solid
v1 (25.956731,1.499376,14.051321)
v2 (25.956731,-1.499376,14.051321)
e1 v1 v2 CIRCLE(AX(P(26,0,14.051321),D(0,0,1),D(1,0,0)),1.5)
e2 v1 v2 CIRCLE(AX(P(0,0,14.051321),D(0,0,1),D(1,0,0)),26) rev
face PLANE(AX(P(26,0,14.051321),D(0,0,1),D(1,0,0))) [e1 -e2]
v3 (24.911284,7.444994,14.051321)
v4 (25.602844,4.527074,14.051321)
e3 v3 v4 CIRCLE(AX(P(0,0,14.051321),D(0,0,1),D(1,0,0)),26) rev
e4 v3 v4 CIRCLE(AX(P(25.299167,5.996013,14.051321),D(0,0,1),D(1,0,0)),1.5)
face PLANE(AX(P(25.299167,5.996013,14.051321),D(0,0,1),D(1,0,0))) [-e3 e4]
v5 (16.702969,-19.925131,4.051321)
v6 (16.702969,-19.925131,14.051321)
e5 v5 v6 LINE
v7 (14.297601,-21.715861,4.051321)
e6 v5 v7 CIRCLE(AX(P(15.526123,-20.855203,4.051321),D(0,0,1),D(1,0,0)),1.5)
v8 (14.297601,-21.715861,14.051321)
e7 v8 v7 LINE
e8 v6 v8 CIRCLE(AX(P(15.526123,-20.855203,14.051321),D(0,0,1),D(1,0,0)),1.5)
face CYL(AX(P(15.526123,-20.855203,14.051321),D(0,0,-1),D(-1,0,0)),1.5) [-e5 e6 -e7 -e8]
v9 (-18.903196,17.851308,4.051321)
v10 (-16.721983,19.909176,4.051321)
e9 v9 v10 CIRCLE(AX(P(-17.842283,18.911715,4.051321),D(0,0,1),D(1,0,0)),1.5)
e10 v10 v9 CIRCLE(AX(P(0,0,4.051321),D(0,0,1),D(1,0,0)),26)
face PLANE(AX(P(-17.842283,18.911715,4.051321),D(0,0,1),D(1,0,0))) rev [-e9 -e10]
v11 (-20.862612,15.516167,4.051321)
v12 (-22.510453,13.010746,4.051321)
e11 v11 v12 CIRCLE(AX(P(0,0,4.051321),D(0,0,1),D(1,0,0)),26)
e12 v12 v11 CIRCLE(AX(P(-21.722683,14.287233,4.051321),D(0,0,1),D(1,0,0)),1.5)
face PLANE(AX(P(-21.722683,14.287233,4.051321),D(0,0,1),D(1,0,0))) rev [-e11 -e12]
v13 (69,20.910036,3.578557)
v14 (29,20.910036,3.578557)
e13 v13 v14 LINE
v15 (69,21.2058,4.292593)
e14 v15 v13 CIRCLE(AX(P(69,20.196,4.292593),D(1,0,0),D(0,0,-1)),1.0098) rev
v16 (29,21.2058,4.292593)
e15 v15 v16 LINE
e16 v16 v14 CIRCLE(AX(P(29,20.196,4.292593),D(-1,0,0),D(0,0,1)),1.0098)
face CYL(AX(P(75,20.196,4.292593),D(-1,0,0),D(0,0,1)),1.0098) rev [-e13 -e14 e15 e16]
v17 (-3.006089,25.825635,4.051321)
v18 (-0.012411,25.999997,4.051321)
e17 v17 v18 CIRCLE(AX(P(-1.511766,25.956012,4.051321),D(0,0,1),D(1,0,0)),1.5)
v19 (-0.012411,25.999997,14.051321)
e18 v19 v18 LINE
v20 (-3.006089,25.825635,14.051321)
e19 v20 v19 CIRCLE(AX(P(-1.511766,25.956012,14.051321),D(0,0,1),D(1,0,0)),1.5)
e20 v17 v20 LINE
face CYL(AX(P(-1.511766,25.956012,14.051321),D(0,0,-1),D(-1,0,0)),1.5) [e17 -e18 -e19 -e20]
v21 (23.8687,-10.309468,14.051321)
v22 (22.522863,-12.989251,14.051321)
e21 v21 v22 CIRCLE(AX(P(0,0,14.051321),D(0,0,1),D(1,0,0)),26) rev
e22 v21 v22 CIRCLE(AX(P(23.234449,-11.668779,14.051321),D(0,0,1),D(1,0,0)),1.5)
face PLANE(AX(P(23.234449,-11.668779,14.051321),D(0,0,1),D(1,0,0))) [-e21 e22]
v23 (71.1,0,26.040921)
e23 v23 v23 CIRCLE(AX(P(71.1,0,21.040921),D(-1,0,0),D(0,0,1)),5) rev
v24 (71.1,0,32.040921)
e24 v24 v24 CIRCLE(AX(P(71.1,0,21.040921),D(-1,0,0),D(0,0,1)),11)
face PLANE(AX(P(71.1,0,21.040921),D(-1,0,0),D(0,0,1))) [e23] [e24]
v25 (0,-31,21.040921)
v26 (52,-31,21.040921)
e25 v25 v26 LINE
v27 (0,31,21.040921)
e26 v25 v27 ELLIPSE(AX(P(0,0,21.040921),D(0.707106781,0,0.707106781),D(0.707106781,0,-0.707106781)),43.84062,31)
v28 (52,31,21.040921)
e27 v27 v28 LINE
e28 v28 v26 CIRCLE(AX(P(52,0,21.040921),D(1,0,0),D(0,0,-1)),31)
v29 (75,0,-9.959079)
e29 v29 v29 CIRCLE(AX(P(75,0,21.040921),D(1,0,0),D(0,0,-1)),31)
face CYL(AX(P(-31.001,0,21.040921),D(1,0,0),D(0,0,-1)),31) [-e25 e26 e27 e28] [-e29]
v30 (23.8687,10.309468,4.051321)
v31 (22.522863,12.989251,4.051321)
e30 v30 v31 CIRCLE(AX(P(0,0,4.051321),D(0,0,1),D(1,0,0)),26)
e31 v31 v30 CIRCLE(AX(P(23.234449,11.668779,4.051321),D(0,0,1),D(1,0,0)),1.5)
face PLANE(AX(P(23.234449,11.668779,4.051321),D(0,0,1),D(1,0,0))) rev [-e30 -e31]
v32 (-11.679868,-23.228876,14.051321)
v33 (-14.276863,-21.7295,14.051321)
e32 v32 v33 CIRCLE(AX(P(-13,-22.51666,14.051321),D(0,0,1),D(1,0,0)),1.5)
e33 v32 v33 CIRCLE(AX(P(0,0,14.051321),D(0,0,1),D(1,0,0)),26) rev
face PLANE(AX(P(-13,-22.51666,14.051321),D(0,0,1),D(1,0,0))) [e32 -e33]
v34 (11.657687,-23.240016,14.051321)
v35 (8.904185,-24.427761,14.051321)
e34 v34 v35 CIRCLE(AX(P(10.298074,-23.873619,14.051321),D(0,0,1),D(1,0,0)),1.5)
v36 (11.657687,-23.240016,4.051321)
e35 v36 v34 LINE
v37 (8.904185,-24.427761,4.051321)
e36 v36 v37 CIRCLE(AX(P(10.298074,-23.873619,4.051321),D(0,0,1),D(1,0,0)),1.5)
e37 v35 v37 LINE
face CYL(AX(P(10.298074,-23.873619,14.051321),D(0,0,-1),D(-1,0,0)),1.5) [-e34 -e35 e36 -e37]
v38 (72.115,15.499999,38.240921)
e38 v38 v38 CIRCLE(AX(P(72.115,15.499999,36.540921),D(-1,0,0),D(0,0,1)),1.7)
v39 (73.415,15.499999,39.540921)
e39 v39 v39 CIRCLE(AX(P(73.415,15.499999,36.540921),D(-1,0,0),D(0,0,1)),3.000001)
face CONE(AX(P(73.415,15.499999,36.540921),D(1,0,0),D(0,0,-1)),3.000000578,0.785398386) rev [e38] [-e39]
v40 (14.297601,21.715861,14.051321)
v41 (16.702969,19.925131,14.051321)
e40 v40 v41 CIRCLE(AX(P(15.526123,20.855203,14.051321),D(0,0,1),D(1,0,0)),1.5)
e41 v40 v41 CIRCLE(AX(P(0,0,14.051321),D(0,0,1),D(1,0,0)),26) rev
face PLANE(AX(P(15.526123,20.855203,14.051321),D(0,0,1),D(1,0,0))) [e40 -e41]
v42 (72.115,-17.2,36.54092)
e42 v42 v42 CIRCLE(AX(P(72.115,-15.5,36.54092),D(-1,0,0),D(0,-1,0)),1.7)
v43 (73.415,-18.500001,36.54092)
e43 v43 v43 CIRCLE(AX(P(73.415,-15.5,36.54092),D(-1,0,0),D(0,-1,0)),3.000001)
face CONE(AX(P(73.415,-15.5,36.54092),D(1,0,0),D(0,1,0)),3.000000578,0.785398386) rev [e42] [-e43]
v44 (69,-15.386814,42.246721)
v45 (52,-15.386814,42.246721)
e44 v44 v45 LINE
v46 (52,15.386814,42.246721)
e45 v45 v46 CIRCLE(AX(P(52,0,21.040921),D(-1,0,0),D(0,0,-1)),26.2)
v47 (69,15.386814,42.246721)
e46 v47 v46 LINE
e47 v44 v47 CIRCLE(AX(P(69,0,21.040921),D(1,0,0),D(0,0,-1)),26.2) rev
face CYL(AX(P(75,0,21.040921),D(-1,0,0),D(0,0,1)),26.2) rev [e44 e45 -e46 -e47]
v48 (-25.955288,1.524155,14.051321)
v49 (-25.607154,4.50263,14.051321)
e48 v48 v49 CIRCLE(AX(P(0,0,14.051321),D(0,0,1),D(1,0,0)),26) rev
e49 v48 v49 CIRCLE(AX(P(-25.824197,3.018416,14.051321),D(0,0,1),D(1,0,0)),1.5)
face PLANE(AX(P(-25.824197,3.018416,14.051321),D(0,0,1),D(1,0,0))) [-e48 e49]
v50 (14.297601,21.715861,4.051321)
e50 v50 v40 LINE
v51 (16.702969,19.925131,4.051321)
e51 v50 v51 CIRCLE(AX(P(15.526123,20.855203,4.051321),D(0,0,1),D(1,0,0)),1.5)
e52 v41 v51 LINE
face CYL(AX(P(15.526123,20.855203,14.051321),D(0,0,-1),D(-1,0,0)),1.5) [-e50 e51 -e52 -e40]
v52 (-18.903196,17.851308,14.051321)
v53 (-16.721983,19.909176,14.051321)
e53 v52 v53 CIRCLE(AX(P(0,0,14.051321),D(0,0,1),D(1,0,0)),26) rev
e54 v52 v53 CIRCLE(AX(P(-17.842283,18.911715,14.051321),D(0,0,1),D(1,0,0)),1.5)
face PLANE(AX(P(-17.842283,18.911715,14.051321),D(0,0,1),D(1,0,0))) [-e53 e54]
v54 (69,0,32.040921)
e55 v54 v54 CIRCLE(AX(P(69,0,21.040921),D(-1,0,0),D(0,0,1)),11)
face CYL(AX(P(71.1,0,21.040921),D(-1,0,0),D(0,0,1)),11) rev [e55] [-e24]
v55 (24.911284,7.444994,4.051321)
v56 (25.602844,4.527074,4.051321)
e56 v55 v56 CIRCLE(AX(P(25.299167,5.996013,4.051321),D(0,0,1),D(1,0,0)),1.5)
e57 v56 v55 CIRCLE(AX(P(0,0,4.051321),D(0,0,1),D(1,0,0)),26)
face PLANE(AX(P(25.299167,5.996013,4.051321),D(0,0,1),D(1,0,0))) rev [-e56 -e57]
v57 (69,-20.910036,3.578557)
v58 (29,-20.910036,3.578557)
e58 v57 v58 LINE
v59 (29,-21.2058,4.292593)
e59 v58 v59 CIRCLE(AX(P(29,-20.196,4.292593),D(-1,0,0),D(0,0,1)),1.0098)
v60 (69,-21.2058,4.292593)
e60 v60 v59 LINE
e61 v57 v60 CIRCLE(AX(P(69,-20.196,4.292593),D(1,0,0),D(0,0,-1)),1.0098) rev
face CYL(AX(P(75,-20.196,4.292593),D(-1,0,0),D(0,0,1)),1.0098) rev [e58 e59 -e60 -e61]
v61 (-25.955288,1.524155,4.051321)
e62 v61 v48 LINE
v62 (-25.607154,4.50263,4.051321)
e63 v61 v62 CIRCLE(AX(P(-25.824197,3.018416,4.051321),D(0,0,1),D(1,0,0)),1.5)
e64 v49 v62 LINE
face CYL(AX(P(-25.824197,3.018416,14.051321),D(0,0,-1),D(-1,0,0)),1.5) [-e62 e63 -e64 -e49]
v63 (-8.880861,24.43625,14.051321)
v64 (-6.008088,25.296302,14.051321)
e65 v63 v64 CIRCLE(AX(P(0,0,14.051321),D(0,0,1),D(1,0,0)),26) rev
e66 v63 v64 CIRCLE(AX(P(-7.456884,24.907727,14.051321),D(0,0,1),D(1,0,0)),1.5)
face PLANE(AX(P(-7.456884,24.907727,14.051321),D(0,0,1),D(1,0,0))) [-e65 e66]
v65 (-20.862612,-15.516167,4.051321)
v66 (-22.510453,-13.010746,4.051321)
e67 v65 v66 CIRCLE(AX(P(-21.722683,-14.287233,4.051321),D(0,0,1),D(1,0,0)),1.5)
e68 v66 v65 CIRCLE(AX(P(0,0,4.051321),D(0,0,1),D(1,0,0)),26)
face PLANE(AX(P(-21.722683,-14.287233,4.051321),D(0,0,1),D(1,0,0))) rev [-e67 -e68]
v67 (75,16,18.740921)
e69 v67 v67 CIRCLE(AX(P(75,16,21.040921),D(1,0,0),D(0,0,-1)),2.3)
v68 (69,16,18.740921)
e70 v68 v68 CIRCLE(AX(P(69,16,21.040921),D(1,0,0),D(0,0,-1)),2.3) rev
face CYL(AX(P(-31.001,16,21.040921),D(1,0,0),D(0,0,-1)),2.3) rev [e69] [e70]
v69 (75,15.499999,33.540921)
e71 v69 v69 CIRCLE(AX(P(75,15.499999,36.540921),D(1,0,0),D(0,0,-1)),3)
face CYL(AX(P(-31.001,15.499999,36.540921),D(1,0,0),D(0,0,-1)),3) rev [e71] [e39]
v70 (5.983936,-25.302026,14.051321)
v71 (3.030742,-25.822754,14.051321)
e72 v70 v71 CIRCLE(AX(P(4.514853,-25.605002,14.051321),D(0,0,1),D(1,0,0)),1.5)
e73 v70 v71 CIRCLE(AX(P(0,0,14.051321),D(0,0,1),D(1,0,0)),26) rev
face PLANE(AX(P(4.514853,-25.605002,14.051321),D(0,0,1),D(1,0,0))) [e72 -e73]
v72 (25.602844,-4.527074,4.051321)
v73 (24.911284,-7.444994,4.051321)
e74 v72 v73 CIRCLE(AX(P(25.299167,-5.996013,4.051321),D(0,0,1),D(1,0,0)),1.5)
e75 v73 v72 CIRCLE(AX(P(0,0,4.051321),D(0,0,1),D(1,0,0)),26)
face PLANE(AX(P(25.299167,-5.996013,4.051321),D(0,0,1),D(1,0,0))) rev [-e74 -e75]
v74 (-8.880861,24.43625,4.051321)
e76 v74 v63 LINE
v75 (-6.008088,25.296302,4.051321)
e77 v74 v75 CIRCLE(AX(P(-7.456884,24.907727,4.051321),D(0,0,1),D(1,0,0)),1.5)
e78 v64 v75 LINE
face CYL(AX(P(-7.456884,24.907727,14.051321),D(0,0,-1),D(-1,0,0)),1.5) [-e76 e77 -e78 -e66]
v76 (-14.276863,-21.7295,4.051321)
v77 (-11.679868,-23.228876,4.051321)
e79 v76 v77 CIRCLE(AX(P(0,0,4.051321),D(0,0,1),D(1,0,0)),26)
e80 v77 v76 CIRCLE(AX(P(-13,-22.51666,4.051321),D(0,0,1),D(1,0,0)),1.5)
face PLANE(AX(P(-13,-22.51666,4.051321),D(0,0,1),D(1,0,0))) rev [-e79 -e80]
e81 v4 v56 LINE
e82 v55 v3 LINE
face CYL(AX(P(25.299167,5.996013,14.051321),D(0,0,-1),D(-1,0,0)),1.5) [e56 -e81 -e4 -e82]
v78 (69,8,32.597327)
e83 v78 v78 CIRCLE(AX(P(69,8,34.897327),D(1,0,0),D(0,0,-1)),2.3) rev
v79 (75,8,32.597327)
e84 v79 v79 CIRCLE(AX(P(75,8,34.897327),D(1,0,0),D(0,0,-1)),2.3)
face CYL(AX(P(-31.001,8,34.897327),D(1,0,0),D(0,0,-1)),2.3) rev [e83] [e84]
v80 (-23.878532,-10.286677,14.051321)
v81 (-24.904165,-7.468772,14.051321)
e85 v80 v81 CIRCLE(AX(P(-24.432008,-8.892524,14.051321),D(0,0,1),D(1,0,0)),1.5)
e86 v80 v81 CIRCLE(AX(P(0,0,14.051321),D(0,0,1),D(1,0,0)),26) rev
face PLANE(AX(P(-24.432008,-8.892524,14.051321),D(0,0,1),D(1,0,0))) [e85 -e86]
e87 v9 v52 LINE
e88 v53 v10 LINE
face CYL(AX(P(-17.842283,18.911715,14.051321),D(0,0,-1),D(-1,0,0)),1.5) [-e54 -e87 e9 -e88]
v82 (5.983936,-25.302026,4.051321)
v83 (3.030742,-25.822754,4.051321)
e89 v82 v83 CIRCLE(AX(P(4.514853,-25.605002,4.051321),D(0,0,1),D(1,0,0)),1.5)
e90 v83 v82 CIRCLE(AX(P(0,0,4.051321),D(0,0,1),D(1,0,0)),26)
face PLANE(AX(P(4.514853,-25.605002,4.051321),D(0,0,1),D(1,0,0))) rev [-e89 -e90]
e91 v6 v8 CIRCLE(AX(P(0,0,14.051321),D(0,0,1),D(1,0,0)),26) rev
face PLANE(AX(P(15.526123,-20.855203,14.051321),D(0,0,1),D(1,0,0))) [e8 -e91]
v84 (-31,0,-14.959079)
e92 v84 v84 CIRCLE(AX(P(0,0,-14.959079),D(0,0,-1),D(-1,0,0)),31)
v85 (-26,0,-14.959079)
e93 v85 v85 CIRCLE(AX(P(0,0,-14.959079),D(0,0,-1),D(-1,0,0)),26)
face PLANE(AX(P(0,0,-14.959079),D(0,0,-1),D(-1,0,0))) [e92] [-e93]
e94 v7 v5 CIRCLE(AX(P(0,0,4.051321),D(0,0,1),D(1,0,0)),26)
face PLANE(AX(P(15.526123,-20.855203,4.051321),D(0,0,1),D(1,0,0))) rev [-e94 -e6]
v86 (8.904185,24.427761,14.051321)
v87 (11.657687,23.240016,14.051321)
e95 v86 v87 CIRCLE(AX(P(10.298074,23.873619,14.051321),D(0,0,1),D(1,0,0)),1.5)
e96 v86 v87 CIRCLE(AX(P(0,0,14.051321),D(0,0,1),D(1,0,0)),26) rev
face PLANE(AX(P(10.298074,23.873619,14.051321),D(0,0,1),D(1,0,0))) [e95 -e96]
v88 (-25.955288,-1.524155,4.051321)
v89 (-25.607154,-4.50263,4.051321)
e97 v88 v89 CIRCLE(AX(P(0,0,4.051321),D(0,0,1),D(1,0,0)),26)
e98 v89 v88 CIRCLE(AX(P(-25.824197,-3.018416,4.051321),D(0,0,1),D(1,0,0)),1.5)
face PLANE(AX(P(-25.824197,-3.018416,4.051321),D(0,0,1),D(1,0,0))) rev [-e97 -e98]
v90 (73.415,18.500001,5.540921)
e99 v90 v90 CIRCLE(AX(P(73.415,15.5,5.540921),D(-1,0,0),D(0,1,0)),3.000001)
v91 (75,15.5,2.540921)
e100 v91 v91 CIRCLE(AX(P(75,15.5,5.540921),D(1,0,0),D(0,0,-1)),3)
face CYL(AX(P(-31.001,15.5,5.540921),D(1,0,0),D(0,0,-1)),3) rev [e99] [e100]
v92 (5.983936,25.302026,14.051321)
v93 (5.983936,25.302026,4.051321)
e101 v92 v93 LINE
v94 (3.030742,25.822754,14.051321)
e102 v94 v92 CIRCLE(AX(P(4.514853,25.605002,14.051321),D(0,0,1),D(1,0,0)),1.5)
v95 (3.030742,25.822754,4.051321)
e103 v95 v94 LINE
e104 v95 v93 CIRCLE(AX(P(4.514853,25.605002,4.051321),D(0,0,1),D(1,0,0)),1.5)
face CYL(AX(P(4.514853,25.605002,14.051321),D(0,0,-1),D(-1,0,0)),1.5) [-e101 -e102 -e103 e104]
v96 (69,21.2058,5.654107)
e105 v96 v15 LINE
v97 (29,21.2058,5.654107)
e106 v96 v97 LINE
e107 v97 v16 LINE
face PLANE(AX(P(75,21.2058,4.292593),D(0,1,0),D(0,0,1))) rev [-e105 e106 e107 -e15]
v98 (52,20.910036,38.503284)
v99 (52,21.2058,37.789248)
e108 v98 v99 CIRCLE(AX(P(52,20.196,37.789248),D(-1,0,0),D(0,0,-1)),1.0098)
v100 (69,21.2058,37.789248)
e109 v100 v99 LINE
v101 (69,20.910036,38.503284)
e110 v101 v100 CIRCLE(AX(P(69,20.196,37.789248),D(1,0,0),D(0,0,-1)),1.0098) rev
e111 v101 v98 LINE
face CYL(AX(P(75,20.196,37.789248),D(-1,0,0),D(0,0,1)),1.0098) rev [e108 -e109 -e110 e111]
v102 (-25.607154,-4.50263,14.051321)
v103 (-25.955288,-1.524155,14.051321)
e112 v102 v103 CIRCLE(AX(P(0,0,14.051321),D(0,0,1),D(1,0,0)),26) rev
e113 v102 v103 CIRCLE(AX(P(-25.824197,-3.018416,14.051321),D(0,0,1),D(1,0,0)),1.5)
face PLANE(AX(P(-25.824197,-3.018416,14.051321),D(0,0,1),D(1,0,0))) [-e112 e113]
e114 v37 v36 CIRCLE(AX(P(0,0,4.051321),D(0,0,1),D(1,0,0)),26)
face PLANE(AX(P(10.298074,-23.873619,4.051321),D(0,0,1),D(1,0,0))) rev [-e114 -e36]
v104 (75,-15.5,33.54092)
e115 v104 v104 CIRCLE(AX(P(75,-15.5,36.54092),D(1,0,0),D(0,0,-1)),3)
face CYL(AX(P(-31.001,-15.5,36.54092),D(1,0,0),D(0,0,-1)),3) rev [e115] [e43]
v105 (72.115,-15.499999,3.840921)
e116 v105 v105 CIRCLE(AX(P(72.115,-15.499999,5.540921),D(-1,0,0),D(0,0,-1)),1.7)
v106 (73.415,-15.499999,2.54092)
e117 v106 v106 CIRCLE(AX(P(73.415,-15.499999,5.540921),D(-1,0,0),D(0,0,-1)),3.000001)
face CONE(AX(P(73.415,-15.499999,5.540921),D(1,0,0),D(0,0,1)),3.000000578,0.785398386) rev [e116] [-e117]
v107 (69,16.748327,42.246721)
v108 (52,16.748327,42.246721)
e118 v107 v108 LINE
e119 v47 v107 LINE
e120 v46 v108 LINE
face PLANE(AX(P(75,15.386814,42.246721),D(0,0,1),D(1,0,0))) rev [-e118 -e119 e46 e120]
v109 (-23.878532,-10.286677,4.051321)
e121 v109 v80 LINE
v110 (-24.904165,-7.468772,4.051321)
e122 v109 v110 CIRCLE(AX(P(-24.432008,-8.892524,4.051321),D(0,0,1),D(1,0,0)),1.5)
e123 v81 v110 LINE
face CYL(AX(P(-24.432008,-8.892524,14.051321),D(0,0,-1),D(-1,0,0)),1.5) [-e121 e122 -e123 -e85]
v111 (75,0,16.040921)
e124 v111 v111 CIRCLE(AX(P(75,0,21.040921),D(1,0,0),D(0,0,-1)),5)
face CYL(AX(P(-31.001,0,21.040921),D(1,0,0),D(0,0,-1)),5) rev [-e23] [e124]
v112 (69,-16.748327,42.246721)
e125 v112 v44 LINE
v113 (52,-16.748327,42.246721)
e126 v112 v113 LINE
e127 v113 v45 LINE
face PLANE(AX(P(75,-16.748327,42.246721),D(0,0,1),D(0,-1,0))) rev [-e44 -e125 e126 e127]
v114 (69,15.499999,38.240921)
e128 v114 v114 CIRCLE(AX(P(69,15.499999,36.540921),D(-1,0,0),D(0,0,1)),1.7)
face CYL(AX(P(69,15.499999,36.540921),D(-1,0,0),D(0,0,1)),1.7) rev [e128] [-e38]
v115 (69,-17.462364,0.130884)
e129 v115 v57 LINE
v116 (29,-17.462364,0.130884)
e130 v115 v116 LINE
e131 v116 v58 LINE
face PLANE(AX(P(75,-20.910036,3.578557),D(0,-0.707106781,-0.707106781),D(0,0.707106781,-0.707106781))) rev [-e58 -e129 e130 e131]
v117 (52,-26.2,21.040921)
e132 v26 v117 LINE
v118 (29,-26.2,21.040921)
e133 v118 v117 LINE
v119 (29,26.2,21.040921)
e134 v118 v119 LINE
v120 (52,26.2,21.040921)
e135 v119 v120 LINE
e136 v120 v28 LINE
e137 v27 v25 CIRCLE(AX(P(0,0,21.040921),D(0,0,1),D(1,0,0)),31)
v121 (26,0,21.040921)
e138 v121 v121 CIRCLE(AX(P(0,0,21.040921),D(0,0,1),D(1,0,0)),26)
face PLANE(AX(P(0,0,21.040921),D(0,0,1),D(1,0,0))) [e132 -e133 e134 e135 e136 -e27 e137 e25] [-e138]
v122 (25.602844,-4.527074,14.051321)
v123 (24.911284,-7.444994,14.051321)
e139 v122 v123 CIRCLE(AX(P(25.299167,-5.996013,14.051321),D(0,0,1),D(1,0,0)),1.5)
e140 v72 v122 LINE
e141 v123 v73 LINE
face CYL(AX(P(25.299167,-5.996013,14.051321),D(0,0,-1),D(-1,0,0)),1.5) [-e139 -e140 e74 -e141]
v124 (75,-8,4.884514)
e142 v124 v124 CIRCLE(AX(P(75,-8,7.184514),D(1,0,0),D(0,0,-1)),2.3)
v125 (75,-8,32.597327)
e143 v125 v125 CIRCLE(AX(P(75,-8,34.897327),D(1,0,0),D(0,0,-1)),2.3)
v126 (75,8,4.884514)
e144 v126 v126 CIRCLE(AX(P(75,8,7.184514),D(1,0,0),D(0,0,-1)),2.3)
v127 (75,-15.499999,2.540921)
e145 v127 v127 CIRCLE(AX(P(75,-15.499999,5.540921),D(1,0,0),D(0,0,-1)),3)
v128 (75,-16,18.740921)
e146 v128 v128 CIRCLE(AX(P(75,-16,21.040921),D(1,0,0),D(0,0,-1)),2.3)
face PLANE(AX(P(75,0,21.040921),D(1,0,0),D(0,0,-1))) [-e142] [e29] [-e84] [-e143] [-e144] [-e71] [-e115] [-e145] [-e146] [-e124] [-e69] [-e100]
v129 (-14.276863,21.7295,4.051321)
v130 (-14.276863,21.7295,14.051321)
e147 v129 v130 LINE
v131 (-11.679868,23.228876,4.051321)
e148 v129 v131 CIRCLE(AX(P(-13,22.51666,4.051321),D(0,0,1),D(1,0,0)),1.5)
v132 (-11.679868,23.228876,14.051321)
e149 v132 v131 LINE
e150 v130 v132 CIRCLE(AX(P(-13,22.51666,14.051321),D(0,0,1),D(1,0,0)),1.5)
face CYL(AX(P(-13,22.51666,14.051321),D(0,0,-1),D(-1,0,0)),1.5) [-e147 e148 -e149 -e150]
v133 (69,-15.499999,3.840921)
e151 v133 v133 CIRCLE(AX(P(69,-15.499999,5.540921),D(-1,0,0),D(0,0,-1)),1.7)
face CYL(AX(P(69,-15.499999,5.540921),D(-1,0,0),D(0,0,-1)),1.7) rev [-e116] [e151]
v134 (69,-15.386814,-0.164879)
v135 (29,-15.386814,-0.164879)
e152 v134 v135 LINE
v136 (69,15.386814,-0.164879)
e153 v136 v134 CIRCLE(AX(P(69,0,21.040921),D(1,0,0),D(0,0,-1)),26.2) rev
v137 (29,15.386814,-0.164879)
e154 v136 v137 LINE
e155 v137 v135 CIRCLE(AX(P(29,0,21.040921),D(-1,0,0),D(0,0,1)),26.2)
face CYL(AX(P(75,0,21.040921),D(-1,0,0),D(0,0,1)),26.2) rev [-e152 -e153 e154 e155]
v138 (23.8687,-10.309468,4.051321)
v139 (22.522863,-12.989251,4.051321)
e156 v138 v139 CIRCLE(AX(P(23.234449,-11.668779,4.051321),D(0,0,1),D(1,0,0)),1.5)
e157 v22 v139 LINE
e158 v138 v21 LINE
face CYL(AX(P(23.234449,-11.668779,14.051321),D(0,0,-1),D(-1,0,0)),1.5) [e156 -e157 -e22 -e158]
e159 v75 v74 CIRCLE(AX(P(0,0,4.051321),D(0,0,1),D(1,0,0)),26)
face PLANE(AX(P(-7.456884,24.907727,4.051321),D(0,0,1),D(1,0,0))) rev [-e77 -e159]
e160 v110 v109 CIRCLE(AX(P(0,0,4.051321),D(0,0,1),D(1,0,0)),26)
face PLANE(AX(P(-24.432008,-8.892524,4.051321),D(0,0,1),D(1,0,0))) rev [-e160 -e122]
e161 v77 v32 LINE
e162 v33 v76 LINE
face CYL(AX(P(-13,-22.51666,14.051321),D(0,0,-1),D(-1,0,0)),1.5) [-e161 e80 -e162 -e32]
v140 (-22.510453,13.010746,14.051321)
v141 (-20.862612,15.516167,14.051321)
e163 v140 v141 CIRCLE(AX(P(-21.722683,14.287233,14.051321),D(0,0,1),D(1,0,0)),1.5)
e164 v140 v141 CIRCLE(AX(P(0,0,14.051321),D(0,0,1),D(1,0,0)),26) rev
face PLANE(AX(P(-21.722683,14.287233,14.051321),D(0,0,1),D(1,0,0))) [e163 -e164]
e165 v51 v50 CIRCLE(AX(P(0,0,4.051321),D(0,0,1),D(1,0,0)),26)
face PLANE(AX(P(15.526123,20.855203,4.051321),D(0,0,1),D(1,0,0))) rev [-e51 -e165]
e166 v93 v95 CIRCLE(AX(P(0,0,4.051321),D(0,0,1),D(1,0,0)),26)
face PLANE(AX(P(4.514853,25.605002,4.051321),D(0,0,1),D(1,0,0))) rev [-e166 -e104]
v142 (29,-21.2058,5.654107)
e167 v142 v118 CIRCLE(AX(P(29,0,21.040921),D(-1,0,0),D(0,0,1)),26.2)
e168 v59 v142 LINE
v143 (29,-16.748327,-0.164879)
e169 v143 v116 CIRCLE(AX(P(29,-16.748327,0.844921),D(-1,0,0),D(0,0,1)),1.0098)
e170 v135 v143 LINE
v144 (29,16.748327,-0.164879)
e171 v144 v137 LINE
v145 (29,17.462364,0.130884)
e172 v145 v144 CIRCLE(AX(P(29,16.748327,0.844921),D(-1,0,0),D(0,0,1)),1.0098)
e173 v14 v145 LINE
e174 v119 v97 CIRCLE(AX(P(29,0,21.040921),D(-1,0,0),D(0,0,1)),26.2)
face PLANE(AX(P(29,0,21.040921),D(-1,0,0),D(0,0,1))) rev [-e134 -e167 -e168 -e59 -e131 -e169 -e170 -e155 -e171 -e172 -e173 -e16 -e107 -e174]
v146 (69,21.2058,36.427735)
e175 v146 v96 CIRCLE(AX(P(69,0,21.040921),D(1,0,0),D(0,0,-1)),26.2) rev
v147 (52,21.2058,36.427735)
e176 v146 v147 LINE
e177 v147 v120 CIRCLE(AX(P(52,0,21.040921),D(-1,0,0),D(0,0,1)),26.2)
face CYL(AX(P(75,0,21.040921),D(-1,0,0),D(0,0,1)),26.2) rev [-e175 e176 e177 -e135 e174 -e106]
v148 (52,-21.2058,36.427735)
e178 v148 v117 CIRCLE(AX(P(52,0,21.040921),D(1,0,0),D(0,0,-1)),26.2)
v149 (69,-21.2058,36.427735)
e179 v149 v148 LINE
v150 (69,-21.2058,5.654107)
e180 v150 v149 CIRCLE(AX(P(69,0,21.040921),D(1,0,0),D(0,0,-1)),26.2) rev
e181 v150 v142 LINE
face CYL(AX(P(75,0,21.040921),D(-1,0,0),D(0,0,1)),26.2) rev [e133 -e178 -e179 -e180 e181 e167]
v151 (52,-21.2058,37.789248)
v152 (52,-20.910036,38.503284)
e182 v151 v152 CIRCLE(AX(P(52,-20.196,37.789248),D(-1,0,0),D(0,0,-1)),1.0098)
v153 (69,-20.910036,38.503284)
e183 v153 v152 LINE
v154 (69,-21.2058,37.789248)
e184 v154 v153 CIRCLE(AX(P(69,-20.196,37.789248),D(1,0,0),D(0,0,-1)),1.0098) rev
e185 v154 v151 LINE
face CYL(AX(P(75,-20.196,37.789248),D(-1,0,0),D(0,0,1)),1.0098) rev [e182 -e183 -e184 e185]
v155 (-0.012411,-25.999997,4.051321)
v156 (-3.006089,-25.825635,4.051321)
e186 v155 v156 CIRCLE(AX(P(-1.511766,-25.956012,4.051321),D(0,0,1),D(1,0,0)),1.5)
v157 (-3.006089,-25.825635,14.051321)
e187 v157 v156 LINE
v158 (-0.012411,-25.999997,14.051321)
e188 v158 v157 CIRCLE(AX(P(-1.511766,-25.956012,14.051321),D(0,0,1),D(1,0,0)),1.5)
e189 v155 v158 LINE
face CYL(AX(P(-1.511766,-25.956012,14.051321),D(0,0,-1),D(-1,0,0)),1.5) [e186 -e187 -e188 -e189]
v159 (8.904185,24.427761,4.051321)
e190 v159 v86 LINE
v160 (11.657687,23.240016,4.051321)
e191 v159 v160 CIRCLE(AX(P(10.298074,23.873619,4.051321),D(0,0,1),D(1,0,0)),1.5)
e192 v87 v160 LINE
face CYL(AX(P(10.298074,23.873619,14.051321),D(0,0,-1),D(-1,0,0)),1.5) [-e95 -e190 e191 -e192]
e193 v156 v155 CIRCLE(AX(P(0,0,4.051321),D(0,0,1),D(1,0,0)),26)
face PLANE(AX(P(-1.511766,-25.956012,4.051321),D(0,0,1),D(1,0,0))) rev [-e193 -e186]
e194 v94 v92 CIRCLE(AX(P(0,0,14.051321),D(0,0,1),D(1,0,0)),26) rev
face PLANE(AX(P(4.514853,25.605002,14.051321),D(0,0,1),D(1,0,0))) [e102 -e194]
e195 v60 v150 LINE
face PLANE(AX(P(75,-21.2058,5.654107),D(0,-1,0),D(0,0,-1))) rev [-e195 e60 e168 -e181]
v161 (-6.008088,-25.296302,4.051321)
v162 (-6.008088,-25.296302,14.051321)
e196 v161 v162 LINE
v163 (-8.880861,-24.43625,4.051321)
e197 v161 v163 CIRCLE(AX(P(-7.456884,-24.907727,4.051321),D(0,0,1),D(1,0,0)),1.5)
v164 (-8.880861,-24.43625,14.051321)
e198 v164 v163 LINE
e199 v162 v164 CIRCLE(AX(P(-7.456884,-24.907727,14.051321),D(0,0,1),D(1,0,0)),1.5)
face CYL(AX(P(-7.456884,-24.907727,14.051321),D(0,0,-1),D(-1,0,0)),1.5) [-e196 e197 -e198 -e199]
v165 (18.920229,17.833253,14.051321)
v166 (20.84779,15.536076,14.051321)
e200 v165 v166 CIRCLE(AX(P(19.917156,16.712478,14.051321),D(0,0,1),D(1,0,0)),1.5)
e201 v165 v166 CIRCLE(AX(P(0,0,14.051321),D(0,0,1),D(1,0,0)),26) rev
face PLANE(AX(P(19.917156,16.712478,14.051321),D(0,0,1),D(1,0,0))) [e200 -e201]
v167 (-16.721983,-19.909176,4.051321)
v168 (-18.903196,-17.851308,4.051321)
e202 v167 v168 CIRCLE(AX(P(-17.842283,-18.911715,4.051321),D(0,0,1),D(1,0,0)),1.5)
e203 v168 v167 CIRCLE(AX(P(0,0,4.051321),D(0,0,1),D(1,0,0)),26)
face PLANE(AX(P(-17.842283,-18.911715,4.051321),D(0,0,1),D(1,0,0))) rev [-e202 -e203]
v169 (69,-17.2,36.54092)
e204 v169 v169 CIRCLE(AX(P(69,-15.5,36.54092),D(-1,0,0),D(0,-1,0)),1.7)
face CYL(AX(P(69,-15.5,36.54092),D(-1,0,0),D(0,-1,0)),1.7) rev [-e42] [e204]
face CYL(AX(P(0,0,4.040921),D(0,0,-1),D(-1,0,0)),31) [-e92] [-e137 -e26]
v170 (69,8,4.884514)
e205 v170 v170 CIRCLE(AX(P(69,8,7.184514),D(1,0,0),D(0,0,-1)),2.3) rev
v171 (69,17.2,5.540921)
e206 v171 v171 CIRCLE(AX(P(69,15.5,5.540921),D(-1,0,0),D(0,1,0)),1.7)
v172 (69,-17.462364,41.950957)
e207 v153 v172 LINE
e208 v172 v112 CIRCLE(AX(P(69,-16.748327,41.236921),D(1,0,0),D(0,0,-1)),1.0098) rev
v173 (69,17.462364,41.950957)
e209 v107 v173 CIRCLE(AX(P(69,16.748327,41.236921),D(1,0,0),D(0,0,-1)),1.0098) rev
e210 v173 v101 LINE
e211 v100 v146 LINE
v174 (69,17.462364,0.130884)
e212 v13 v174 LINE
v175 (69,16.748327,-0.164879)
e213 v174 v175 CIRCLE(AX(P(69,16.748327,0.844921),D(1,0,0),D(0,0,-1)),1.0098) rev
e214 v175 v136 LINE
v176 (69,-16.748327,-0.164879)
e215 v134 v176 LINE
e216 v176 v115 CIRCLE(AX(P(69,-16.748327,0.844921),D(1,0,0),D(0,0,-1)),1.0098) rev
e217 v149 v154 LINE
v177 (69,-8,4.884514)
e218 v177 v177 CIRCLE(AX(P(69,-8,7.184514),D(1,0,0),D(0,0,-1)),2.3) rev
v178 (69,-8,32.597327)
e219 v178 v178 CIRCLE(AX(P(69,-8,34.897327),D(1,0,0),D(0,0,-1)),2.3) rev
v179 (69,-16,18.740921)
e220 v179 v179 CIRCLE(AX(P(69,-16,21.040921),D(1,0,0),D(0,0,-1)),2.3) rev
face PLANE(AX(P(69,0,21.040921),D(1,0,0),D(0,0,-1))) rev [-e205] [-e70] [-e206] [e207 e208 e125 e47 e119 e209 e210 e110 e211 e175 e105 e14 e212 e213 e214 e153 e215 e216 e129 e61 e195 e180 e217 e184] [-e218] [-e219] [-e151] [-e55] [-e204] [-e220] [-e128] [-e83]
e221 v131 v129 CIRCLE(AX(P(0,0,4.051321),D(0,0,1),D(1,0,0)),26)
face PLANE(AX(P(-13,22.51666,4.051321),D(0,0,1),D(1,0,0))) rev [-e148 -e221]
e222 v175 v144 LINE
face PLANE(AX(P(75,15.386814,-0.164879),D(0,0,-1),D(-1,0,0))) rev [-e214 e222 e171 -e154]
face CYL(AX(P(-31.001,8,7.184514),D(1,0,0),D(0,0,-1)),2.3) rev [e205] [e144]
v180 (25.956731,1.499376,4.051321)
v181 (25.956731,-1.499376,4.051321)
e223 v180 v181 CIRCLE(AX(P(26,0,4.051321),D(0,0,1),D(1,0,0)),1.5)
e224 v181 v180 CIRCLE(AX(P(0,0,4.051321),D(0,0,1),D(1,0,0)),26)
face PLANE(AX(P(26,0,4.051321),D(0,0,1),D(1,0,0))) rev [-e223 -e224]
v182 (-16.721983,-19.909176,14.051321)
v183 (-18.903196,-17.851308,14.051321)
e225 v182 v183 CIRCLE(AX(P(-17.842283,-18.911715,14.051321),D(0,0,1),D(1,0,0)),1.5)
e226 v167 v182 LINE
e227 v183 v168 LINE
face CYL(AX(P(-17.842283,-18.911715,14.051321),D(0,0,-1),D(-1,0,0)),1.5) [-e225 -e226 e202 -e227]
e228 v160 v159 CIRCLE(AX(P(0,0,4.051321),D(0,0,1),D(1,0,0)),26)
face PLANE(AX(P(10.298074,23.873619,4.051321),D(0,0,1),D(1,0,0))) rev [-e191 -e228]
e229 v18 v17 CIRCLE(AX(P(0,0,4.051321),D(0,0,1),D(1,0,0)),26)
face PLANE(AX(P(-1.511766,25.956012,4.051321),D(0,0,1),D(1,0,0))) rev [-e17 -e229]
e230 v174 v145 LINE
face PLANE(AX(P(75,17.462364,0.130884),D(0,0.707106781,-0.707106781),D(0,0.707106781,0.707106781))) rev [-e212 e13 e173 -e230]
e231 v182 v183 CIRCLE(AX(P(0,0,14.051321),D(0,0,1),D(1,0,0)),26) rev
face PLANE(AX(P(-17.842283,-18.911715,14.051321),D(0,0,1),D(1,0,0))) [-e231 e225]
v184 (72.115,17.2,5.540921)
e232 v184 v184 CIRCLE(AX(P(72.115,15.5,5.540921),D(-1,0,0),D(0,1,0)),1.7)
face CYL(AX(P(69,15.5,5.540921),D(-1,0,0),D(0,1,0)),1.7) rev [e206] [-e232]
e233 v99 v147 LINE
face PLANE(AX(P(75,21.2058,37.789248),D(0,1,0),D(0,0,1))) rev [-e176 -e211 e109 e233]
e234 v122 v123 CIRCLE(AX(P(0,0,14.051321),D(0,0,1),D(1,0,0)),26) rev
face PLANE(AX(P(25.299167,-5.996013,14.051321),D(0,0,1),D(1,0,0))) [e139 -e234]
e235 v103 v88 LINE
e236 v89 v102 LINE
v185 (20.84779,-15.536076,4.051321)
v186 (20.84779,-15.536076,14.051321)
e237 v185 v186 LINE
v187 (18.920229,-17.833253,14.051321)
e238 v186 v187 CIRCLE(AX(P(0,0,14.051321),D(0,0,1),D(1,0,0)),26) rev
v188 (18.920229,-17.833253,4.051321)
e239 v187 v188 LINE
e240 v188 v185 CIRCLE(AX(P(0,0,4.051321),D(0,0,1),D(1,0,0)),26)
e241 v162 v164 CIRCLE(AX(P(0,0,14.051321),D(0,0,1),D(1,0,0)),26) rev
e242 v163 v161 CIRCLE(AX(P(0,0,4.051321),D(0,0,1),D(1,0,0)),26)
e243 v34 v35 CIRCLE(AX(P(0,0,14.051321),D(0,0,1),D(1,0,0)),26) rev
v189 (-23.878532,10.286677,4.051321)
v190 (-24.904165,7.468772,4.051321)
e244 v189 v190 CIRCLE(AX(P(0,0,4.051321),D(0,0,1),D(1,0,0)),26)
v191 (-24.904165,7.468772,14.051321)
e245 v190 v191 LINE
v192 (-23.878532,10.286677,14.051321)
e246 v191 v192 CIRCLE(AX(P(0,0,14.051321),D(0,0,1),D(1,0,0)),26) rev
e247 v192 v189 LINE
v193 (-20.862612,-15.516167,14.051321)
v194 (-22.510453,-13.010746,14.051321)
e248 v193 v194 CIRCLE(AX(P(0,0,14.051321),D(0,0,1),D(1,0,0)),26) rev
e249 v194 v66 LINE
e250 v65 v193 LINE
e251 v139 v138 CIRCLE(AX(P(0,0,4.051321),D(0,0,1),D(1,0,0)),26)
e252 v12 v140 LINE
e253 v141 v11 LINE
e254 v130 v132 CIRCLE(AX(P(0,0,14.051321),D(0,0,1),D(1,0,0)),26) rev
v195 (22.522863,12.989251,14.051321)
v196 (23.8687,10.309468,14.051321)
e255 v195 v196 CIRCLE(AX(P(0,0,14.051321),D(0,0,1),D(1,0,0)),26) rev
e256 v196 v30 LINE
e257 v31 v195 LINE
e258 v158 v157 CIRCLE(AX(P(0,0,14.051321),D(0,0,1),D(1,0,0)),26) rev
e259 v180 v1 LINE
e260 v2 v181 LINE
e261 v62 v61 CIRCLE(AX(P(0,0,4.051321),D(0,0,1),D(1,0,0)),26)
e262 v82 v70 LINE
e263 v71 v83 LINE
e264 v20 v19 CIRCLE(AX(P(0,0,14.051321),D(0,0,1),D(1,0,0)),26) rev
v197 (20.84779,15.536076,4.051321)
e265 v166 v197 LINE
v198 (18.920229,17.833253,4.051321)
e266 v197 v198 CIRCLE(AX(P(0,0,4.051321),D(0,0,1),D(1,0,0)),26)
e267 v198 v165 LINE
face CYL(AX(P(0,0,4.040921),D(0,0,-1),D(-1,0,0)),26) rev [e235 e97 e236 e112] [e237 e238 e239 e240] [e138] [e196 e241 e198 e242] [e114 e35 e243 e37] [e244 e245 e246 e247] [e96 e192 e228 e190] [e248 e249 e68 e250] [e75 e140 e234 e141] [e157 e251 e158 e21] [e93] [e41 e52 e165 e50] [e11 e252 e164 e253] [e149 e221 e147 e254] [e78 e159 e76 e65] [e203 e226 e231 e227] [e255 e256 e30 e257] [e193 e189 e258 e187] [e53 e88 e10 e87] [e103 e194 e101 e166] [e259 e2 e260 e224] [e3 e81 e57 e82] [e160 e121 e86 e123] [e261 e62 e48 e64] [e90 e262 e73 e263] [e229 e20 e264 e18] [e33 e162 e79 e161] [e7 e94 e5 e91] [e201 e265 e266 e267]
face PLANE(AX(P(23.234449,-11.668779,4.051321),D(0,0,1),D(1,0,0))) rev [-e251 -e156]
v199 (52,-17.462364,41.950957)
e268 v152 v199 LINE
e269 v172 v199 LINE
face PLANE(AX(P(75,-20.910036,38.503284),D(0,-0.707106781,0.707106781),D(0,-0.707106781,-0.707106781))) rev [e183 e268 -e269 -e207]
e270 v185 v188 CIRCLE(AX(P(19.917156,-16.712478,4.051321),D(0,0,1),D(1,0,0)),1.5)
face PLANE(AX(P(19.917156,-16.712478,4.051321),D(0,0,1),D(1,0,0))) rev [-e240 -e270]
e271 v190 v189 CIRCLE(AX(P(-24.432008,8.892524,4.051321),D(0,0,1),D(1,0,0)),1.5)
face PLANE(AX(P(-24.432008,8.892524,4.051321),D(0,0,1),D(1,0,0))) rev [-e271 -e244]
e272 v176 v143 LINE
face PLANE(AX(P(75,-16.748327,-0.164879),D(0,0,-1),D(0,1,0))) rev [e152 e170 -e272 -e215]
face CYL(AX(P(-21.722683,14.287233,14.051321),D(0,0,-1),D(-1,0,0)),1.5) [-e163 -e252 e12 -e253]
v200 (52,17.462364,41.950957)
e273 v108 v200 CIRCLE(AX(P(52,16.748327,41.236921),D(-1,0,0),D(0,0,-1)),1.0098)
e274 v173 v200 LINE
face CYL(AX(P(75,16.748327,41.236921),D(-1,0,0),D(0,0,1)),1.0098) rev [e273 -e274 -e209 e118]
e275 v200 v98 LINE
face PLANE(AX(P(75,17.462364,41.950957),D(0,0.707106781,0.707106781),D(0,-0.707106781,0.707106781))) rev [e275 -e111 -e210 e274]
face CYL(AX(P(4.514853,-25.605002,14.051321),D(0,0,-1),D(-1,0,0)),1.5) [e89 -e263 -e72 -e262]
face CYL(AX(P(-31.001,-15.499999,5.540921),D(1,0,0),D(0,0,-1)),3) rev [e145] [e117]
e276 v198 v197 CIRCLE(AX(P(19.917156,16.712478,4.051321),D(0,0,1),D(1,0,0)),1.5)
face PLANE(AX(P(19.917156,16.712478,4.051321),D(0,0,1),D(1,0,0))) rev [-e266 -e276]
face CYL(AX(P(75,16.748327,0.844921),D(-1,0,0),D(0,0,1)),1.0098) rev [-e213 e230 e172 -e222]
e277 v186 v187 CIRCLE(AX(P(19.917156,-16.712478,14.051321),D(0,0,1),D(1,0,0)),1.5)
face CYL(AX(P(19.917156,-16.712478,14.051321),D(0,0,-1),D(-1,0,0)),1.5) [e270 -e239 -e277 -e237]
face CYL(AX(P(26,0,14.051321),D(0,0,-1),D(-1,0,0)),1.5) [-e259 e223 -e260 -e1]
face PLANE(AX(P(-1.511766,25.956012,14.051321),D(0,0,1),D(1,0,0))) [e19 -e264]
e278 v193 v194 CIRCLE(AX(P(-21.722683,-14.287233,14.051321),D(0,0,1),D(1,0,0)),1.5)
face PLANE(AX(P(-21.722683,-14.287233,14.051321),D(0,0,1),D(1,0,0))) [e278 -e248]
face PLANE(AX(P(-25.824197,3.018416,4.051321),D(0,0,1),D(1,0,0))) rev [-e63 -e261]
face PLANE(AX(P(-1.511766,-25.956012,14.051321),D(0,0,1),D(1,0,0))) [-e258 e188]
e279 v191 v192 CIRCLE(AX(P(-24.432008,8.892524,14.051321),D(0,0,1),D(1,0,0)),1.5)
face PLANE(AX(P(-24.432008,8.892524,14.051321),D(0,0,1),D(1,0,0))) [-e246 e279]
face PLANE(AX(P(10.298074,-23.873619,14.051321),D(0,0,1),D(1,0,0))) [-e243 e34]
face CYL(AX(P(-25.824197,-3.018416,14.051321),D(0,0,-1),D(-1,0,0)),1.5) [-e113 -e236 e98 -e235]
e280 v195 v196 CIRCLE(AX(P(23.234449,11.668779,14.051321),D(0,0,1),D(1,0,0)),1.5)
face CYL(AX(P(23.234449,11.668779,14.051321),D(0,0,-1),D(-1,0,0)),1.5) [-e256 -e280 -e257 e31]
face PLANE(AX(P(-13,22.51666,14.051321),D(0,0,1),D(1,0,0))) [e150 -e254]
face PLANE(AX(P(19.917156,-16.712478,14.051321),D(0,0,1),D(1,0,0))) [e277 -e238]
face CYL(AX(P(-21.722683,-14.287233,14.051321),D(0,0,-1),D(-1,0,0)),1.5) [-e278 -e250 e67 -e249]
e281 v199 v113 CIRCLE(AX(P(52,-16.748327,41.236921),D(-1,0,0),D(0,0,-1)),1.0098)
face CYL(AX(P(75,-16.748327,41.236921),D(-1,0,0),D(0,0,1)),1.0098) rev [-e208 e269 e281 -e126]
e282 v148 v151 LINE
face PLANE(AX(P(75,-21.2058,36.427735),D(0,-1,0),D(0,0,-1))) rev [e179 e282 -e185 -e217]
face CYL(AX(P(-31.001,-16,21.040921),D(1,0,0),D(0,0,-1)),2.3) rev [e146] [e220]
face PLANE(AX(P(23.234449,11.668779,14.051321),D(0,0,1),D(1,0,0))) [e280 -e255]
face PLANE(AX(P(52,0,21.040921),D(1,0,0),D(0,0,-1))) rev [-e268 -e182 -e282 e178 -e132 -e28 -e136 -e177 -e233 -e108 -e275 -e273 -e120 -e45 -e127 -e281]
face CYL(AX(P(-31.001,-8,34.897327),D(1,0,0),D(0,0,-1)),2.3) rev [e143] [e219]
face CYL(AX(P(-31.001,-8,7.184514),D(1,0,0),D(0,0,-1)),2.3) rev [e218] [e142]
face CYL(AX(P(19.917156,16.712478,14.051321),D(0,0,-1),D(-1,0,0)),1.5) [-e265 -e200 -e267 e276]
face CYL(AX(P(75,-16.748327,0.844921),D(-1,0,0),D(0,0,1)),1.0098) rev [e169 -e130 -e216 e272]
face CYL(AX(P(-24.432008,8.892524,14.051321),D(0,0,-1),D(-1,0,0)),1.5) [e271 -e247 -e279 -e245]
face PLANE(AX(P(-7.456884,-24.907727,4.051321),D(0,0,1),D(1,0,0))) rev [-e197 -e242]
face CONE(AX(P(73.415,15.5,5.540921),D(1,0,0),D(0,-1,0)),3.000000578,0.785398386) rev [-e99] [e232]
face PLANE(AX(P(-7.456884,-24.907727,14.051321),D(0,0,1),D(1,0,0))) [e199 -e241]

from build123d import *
from build123d.topology import SkipClean

# Parameters (mm, degrees)
SKETCH3_R                = 31
SKETCH3_R_2              = 26
BOSS_EXTRUDE1_DEPTH      = 7
SKETCH4_R                = 31
SKETCH4_R_2              = 26
BOSS_EXTRUDE2_DEPTH      = 10
SKETCH5_R                = 1.5
BOSS_EXTRUDE3_DEPTH      = 10
SKETCH7_R                = 31
SKETCH7_R_2              = 26
BOSS_EXTRUDE4_DEPTH      = 7
BOSS_EXTRUDE5_START      = 12
SKETCH33_R               = 31
SKETCH33_R_2             = 26
BOSS_EXTRUDE5_DEPTH      = 12
BOSS_EXTRUDE6_REACH      = 114.427
BOSS_EXTRUDE6_END_RADIUS = 31
BOSS_EXTRUDE7_DEPTH      = 23
CUT_EXTRUDE1_DEPTH       = 23
CUT_EXTRUDE2_START       = 23
CUT_EXTRUDE2_DEPTH       = 23
SKETCH42_R               = 31
BOSS_EXTRUDE8_DEPTH      = 6
SKETCH40_R               = 11
CUT_EXTRUDE3_DEPTH       = 2.1
CUT_EXTRUDE4_REACH       = 124.087
SKETCH39_R               = 5
SKETCH39_R_2             = 2.3
SKETCH39_R_3             = 3
CIRPATTERN1_COUNT        = 4


with BuildPart() as part:
    # Sketch3 → Boss-Extrude1 (new body)
    with BuildSketch(Plane.XY.offset(-2.959079422)):
        Circle(SKETCH3_R)
        Circle(SKETCH3_R_2, mode=Mode.SUBTRACT)
    extrude(amount=BOSS_EXTRUDE1_DEPTH)

    # Sketch4 → Boss-Extrude2 (add)
    with BuildSketch(Plane.XY.offset(4.040920578)):
        Circle(SKETCH4_R)
        Circle(SKETCH4_R_2, mode=Mode.SUBTRACT)
    extrude(amount=BOSS_EXTRUDE2_DEPTH)

    # Sketch5 → Boss-Extrude3 (add)
    with BuildSketch(Plane.XY.offset(4.051320578)):
        with Locations((26, 0)):
            Circle(SKETCH5_R)
        with Locations((25.299166635, -5.996012639)):
            Circle(SKETCH5_R)
        with Locations((23.234448648, -11.668778685)):
            Circle(SKETCH5_R)
        with Locations((19.917155521, -16.712477852)):
            Circle(SKETCH5_R)
        with Locations((15.526123384, -20.855203012)):
            Circle(SKETCH5_R)
        with Locations((10.298073917, -23.873618779)):
            Circle(SKETCH5_R)
        with Locations((4.514852619, -25.605001578)):
            Circle(SKETCH5_R)
        with Locations((-1.511765552, -25.956012115)):
            Circle(SKETCH5_R)
        with Locations((-7.45688405, -24.90772732)):
            Circle(SKETCH5_R)
        with Locations((-13, -22.516660498)):
            Circle(SKETCH5_R)
        with Locations((-17.842282585, -18.911714681)):
            Circle(SKETCH5_R)
        with Locations((-21.722683097, -14.28723343)):
            Circle(SKETCH5_R)
        with Locations((-24.43200814, -8.892523726)):
            Circle(SKETCH5_R)
        with Locations((-25.824197301, -3.018415767)):
            Circle(SKETCH5_R)
        with Locations((-25.824197301, 3.018415767)):
            Circle(SKETCH5_R)
        with Locations((-24.43200814, 8.892523726)):
            Circle(SKETCH5_R)
        with Locations((-21.722683097, 14.28723343)):
            Circle(SKETCH5_R)
        with Locations((-17.842282585, 18.911714681)):
            Circle(SKETCH5_R)
        with Locations((-13, 22.516660498)):
            Circle(SKETCH5_R)
        with Locations((-7.45688405, 24.90772732)):
            Circle(SKETCH5_R)
        with Locations((-1.511765552, 25.956012115)):
            Circle(SKETCH5_R)
        with Locations((4.514852619, 25.605001578)):
            Circle(SKETCH5_R)
        with Locations((10.298073917, 23.873618779)):
            Circle(SKETCH5_R)
        with Locations((15.526123384, 20.855203012)):
            Circle(SKETCH5_R)
        with Locations((19.917155521, 16.712477852)):
            Circle(SKETCH5_R)
        with Locations((23.234448648, 11.668778685)):
            Circle(SKETCH5_R)
        with Locations((25.299166635, 5.996012639)):
            Circle(SKETCH5_R)
    extrude(amount=BOSS_EXTRUDE3_DEPTH)

    # Sketch7 → Boss-Extrude4 (add)
    with BuildSketch(Plane.XY.offset(14.040920578)):
        Circle(SKETCH7_R)
        Circle(SKETCH7_R_2, mode=Mode.SUBTRACT)
    extrude(amount=BOSS_EXTRUDE4_DEPTH)

    # Sketch33 → Boss-Extrude5 (add)
    with SkipClean():  # the faces are left unmerged after this step: merging them gives an invalid solid
        with BuildSketch(Plane(origin=(0, 0, -2.959079422), x_dir=(-1, 0, 0), z_dir=(0, 0, -1)).offset(BOSS_EXTRUDE5_START)):
            Circle(SKETCH33_R)
            Circle(SKETCH33_R_2, mode=Mode.SUBTRACT)
        extrude(amount=-BOSS_EXTRUDE5_DEPTH)

    # Boss-Extrude6: up to this cylinder (the profile starts outside it)
    with SkipClean():  # the faces are left unmerged after this step: merging them gives an invalid solid
        boss_extrude6_end = Plane(origin=(0, 0, 7.884112), z_dir=(0, 0, -1)) * Cylinder(BOSS_EXTRUDE6_END_RADIUS, 291.854, mode=Mode.PRIVATE)
        # Sketch34 → Boss-Extrude6 (add, up to the surface)
        with BuildSketch(Plane(origin=(75, 0, 0), x_dir=(0, 0, -1), z_dir=(1, 0, 0)), mode=Mode.PRIVATE) as boss_extrude6_sk1:
            with BuildLine():
                Line((-21.040920578, 31), (-21.040920578, -31))
                ThreePointArc((-21.040920578, -31), (9.959079422, 0), (-21.040920578, 31))
            make_face()
        boss_extrude6_tool1 = extrude(boss_extrude6_sk1.sketch, amount=-BOSS_EXTRUDE6_REACH, mode=Mode.PRIVATE) - boss_extrude6_end
        add(boss_extrude6_tool1.solids().sort_by_distance((75, 0, 7.884112))[0])

    # Sketch35 → Boss-Extrude7 (add)
    with SkipClean():  # the faces are left unmerged after this step: merging them gives an invalid solid
        with BuildSketch(Plane(origin=(75, 0, 0), x_dir=(0, 0, -1), z_dir=(1, 0, 0))):
            with BuildLine():
                Line((-21.040920578, 31), (-21.040920578, -31))
                ThreePointArc((-21.040920578, -31), (-52.040920578, 0), (-21.040920578, 31))
            make_face()
        extrude(amount=-BOSS_EXTRUDE7_DEPTH)
    add(part.part.scale(1), mode=Mode.REPLACE)  # the faces are merged on a copy

    # Sketch37 → Cut-Extrude1 (cut)
    with BuildSketch(Plane.ZY.offset(-52)):
        with BuildLine():
            Line((37.789247723, 21.2058), (36.42773462, 21.2058))
            ThreePointArc((36.42773462, 21.2058), (21.040920578, 26.2), (5.654106536, 21.2058))
            Line((5.654106536, 21.2058), (4.292593433, 21.2058))
            ThreePointArc((4.292593433, 21.2058), (3.906159703, 21.128933552), (3.578557006, 20.910036428))
            Line((3.578557006, 20.910036428), (0.13088415, 17.462363572))
            ThreePointArc((0.13088415, 17.462363572), (-0.088012974, 17.134760875), (-0.164879422, 16.748327145))
            Line((-0.164879422, 16.748327145), (-0.164879422, 15.386814042))
            ThreePointArc((-0.164879422, 15.386814042), (-5.159079422, 0), (-0.164879422, -15.386814042))
            Line((-0.164879422, -15.386814042), (-0.164879422, -16.748327145))
            ThreePointArc((-0.164879422, -16.748327145), (-0.088012974, -17.134760875), (0.13088415, -17.462363572))
            Line((0.13088415, -17.462363572), (3.578557006, -20.910036428))
            ThreePointArc((3.578557006, -20.910036428), (3.906159703, -21.128933552), (4.292593433, -21.2058))
            Line((4.292593433, -21.2058), (5.654106536, -21.2058))
            ThreePointArc((5.654106536, -21.2058), (21.040920578, -26.2), (36.42773462, -21.2058))
            Line((36.42773462, -21.2058), (37.789247723, -21.2058))
            ThreePointArc((37.789247723, -21.2058), (38.175681453, -21.128933552), (38.50328415, -20.910036428))
            Line((38.50328415, -20.910036428), (41.950957006, -17.462363572))
            ThreePointArc((41.950957006, -17.462363572), (42.16985413, -17.134760875), (42.246720578, -16.748327145))
            Line((42.246720578, -16.748327145), (42.246720578, -15.386814042))
            ThreePointArc((42.246720578, -15.386814042), (47.240920578, 0), (42.246720578, 15.386814042))
            Line((42.246720578, 15.386814042), (42.246720578, 16.748327145))
            ThreePointArc((42.246720578, 16.748327145), (42.16985413, 17.134760875), (41.950957006, 17.462363572))
            Line((41.950957006, 17.462363572), (38.50328415, 20.910036428))
            ThreePointArc((38.50328415, 20.910036428), (38.175681453, 21.128933552), (37.789247723, 21.2058))
        make_face()
    extrude(amount=-CUT_EXTRUDE1_DEPTH, mode=Mode.SUBTRACT)

    # Sketch38 → Cut-Extrude2 (cut)
    with BuildSketch(Plane.ZY.offset(-52).offset(CUT_EXTRUDE2_START)):
        with BuildLine():
            Line((21.040920578, 26.2), (21.040920578, -26.2))
            ThreePointArc((21.040920578, -26.2), (12.952408972, -24.920192214), (5.654106536, -21.2058))
            Line((5.654106536, -21.2058), (4.292593433, -21.2058))
            ThreePointArc((4.292593433, -21.2058), (3.906159703, -21.128933552), (3.578557006, -20.910036428))
            Line((3.578557006, -20.910036428), (0.13088415, -17.462363572))
            ThreePointArc((0.13088415, -17.462363572), (-0.088012974, -17.134760875), (-0.164879422, -16.748327145))
            Line((-0.164879422, -16.748327145), (-0.164879422, -15.386814042))
            ThreePointArc((-0.164879422, -15.386814042), (-5.159079422, 0), (-0.164879422, 15.386814042))
            Line((-0.164879422, 15.386814042), (-0.164879422, 16.748327145))
            ThreePointArc((-0.164879422, 16.748327145), (-0.088012974, 17.134760875), (0.13088415, 17.462363572))
            Line((0.13088415, 17.462363572), (3.578557006, 20.910036428))
            ThreePointArc((3.578557006, 20.910036428), (3.906159703, 21.128933552), (4.292593433, 21.2058))
            Line((4.292593433, 21.2058), (5.654106536, 21.2058))
            ThreePointArc((5.654106536, 21.2058), (12.952408972, 24.920192214), (21.040920578, 26.2))
        make_face()
    extrude(amount=-CUT_EXTRUDE2_DEPTH, mode=Mode.SUBTRACT)

    # Sketch42 → Boss-Extrude8 (add)
    with BuildSketch(Plane(origin=(75, 0, 0), x_dir=(0, 0, -1), z_dir=(1, 0, 0))):
        with Locations((-21.040920578, 0)):
            Circle(SKETCH42_R)
    extrude(amount=-BOSS_EXTRUDE8_DEPTH)

    # Sketch40 → Cut-Extrude3 (cut)
    with BuildSketch(Plane.ZY.offset(-69)):
        with Locations((21.040920578, 0)):
            Circle(SKETCH40_R)
    extrude(amount=-CUT_EXTRUDE3_DEPTH, mode=Mode.SUBTRACT)

    # Sketch39 → Cut-Extrude4 (cut, up to next)
    with BuildSketch(Plane(origin=(75, 0, 0), x_dir=(0, 0, -1), z_dir=(1, 0, 0)), mode=Mode.PRIVATE) as cut_extrude4_sk1:
        with Locations((-21.040920578, 0)):
            Circle(SKETCH39_R)
    cut_extrude4_tool1 = extrude(cut_extrude4_sk1.sketch, amount=-CUT_EXTRUDE4_REACH, mode=Mode.PRIVATE) & part.part
    # Sketch39 → Cut-Extrude4 (cut, up to next)
    with BuildSketch(Plane(origin=(75, 0, 0), x_dir=(0, 0, -1), z_dir=(1, 0, 0)), mode=Mode.PRIVATE) as cut_extrude4_sk2:
        with Locations((-34.897327039, -8)):
            Circle(SKETCH39_R_2)
    cut_extrude4_tool2 = extrude(cut_extrude4_sk2.sketch, amount=-CUT_EXTRUDE4_REACH, mode=Mode.PRIVATE) & part.part
    # Sketch39 → Cut-Extrude4 (cut, up to next)
    with BuildSketch(Plane(origin=(75, 0, 0), x_dir=(0, 0, -1), z_dir=(1, 0, 0)), mode=Mode.PRIVATE) as cut_extrude4_sk3:
        with Locations((-5.540921156, 15.5)):
            Circle(SKETCH39_R_3)
    cut_extrude4_tool3 = extrude(cut_extrude4_sk3.sketch, amount=-CUT_EXTRUDE4_REACH, mode=Mode.PRIVATE) & part.part
    # Sketch39 → Cut-Extrude4 (cut, up to next)
    with BuildSketch(Plane(origin=(75, 0, 0), x_dir=(0, 0, -1), z_dir=(1, 0, 0)), mode=Mode.PRIVATE) as cut_extrude4_sk4:
        with Locations((-21.040920578, -16)):
            Circle(SKETCH39_R_2)
    cut_extrude4_tool4 = extrude(cut_extrude4_sk4.sketch, amount=-CUT_EXTRUDE4_REACH, mode=Mode.PRIVATE) & part.part
    # Sketch39 → Cut-Extrude4 (cut, up to next)
    with BuildSketch(Plane(origin=(75, 0, 0), x_dir=(0, 0, -1), z_dir=(1, 0, 0)), mode=Mode.PRIVATE) as cut_extrude4_sk5:
        with Locations((-7.184514117, -8)):
            Circle(SKETCH39_R_2)
    cut_extrude4_tool5 = extrude(cut_extrude4_sk5.sketch, amount=-CUT_EXTRUDE4_REACH, mode=Mode.PRIVATE) & part.part
    # Sketch39 → Cut-Extrude4 (cut, up to next)
    with BuildSketch(Plane(origin=(75, 0, 0), x_dir=(0, 0, -1), z_dir=(1, 0, 0)), mode=Mode.PRIVATE) as cut_extrude4_sk6:
        with Locations((-7.184514117, 8)):
            Circle(SKETCH39_R_2)
    cut_extrude4_tool6 = extrude(cut_extrude4_sk6.sketch, amount=-CUT_EXTRUDE4_REACH, mode=Mode.PRIVATE) & part.part
    # Sketch39 → Cut-Extrude4 (cut, up to next)
    with BuildSketch(Plane(origin=(75, 0, 0), x_dir=(0, 0, -1), z_dir=(1, 0, 0)), mode=Mode.PRIVATE) as cut_extrude4_sk7:
        with Locations((-21.040920578, 16)):
            Circle(SKETCH39_R_2)
    cut_extrude4_tool7 = extrude(cut_extrude4_sk7.sketch, amount=-CUT_EXTRUDE4_REACH, mode=Mode.PRIVATE) & part.part
    # Sketch39 → Cut-Extrude4 (cut, up to next)
    with BuildSketch(Plane(origin=(75, 0, 0), x_dir=(0, 0, -1), z_dir=(1, 0, 0)), mode=Mode.PRIVATE) as cut_extrude4_sk8:
        with Locations((-34.897327039, 8)):
            Circle(SKETCH39_R_2)
    cut_extrude4_tool8 = extrude(cut_extrude4_sk8.sketch, amount=-CUT_EXTRUDE4_REACH, mode=Mode.PRIVATE) & part.part
    # Sketch39 → Cut-Extrude4 (cut, up to next)
    with BuildSketch(Plane(origin=(75, 0, 0), x_dir=(0, 0, -1), z_dir=(1, 0, 0)), mode=Mode.PRIVATE) as cut_extrude4_sk9:
        with Locations((-5.540920578, -15.499999422)):
            Circle(SKETCH39_R_3)
    cut_extrude4_tool9 = extrude(cut_extrude4_sk9.sketch, amount=-CUT_EXTRUDE4_REACH, mode=Mode.PRIVATE) & part.part
    # Sketch39 → Cut-Extrude4 (cut, up to next)
    with BuildSketch(Plane(origin=(75, 0, 0), x_dir=(0, 0, -1), z_dir=(1, 0, 0)), mode=Mode.PRIVATE) as cut_extrude4_sk10:
        with Locations((-36.54092, -15.5)):
            Circle(SKETCH39_R_3)
    cut_extrude4_tool10 = extrude(cut_extrude4_sk10.sketch, amount=-CUT_EXTRUDE4_REACH, mode=Mode.PRIVATE) & part.part
    # Sketch39 → Cut-Extrude4 (cut, up to next)
    with BuildSketch(Plane(origin=(75, 0, 0), x_dir=(0, 0, -1), z_dir=(1, 0, 0)), mode=Mode.PRIVATE) as cut_extrude4_sk11:
        with Locations((-36.540920578, 15.499999422)):
            Circle(SKETCH39_R_3)
    cut_extrude4_tool11 = extrude(cut_extrude4_sk11.sketch, amount=-CUT_EXTRUDE4_REACH, mode=Mode.PRIVATE) & part.part
    add(cut_extrude4_tool1.solids().sort_by_distance((75, 0, 21.040921))[0], mode=Mode.SUBTRACT)
    add(cut_extrude4_tool2.solids().sort_by_distance((75, -8, 34.897327))[0], mode=Mode.SUBTRACT)
    add(cut_extrude4_tool3.solids().sort_by_distance((75, 15.5, 5.540921))[0], mode=Mode.SUBTRACT)
    add(cut_extrude4_tool4.solids().sort_by_distance((75, -16, 21.040921))[0], mode=Mode.SUBTRACT)
    add(cut_extrude4_tool5.solids().sort_by_distance((75, -8, 7.184514))[0], mode=Mode.SUBTRACT)
    add(cut_extrude4_tool6.solids().sort_by_distance((75, 8, 7.184514))[0], mode=Mode.SUBTRACT)
    add(cut_extrude4_tool7.solids().sort_by_distance((75, 16, 21.040921))[0], mode=Mode.SUBTRACT)
    add(cut_extrude4_tool8.solids().sort_by_distance((75, 8, 34.897327))[0], mode=Mode.SUBTRACT)
    add(cut_extrude4_tool9.solids().sort_by_distance((75, -15.499999, 5.540921))[0], mode=Mode.SUBTRACT)
    add(cut_extrude4_tool10.solids().sort_by_distance((75, -15.5, 36.54092))[0], mode=Mode.SUBTRACT)
    add(cut_extrude4_tool11.solids().sort_by_distance((75, 15.499999, 36.540921))[0], mode=Mode.SUBTRACT)

    # Sketch41 → Revolve1 (revolve)
    with SkipClean():  # the faces are left unmerged after this step: merging them gives an invalid solid
        with BuildSketch(Plane(origin=(0, 0, 36.54092), x_dir=(-1, 0, 0), z_dir=(0, 0, -1))):
            Polygon((-72.115, 17.199999422), (-73.415, 18.5), (-69, 18.5), (-69, 17.199999422), align=None)
        revolve1 = revolve(axis=Axis((69, 15.499999422, 36.540920578), (1, 0, 0)))

    # CirPattern1: Revolve1 ×4 about axis
    with SkipClean():  # the faces are left unmerged after this step: merging them gives an invalid solid
        cirpattern1_axis = Axis((75, 0, 21.040920578), (1, 0, 0))
        for i in range(1, CIRPATTERN1_COUNT):
            add(revolve1.rotate(cirpattern1_axis, i * 360 / CIRPATTERN1_COUNT))


solid = part.part
